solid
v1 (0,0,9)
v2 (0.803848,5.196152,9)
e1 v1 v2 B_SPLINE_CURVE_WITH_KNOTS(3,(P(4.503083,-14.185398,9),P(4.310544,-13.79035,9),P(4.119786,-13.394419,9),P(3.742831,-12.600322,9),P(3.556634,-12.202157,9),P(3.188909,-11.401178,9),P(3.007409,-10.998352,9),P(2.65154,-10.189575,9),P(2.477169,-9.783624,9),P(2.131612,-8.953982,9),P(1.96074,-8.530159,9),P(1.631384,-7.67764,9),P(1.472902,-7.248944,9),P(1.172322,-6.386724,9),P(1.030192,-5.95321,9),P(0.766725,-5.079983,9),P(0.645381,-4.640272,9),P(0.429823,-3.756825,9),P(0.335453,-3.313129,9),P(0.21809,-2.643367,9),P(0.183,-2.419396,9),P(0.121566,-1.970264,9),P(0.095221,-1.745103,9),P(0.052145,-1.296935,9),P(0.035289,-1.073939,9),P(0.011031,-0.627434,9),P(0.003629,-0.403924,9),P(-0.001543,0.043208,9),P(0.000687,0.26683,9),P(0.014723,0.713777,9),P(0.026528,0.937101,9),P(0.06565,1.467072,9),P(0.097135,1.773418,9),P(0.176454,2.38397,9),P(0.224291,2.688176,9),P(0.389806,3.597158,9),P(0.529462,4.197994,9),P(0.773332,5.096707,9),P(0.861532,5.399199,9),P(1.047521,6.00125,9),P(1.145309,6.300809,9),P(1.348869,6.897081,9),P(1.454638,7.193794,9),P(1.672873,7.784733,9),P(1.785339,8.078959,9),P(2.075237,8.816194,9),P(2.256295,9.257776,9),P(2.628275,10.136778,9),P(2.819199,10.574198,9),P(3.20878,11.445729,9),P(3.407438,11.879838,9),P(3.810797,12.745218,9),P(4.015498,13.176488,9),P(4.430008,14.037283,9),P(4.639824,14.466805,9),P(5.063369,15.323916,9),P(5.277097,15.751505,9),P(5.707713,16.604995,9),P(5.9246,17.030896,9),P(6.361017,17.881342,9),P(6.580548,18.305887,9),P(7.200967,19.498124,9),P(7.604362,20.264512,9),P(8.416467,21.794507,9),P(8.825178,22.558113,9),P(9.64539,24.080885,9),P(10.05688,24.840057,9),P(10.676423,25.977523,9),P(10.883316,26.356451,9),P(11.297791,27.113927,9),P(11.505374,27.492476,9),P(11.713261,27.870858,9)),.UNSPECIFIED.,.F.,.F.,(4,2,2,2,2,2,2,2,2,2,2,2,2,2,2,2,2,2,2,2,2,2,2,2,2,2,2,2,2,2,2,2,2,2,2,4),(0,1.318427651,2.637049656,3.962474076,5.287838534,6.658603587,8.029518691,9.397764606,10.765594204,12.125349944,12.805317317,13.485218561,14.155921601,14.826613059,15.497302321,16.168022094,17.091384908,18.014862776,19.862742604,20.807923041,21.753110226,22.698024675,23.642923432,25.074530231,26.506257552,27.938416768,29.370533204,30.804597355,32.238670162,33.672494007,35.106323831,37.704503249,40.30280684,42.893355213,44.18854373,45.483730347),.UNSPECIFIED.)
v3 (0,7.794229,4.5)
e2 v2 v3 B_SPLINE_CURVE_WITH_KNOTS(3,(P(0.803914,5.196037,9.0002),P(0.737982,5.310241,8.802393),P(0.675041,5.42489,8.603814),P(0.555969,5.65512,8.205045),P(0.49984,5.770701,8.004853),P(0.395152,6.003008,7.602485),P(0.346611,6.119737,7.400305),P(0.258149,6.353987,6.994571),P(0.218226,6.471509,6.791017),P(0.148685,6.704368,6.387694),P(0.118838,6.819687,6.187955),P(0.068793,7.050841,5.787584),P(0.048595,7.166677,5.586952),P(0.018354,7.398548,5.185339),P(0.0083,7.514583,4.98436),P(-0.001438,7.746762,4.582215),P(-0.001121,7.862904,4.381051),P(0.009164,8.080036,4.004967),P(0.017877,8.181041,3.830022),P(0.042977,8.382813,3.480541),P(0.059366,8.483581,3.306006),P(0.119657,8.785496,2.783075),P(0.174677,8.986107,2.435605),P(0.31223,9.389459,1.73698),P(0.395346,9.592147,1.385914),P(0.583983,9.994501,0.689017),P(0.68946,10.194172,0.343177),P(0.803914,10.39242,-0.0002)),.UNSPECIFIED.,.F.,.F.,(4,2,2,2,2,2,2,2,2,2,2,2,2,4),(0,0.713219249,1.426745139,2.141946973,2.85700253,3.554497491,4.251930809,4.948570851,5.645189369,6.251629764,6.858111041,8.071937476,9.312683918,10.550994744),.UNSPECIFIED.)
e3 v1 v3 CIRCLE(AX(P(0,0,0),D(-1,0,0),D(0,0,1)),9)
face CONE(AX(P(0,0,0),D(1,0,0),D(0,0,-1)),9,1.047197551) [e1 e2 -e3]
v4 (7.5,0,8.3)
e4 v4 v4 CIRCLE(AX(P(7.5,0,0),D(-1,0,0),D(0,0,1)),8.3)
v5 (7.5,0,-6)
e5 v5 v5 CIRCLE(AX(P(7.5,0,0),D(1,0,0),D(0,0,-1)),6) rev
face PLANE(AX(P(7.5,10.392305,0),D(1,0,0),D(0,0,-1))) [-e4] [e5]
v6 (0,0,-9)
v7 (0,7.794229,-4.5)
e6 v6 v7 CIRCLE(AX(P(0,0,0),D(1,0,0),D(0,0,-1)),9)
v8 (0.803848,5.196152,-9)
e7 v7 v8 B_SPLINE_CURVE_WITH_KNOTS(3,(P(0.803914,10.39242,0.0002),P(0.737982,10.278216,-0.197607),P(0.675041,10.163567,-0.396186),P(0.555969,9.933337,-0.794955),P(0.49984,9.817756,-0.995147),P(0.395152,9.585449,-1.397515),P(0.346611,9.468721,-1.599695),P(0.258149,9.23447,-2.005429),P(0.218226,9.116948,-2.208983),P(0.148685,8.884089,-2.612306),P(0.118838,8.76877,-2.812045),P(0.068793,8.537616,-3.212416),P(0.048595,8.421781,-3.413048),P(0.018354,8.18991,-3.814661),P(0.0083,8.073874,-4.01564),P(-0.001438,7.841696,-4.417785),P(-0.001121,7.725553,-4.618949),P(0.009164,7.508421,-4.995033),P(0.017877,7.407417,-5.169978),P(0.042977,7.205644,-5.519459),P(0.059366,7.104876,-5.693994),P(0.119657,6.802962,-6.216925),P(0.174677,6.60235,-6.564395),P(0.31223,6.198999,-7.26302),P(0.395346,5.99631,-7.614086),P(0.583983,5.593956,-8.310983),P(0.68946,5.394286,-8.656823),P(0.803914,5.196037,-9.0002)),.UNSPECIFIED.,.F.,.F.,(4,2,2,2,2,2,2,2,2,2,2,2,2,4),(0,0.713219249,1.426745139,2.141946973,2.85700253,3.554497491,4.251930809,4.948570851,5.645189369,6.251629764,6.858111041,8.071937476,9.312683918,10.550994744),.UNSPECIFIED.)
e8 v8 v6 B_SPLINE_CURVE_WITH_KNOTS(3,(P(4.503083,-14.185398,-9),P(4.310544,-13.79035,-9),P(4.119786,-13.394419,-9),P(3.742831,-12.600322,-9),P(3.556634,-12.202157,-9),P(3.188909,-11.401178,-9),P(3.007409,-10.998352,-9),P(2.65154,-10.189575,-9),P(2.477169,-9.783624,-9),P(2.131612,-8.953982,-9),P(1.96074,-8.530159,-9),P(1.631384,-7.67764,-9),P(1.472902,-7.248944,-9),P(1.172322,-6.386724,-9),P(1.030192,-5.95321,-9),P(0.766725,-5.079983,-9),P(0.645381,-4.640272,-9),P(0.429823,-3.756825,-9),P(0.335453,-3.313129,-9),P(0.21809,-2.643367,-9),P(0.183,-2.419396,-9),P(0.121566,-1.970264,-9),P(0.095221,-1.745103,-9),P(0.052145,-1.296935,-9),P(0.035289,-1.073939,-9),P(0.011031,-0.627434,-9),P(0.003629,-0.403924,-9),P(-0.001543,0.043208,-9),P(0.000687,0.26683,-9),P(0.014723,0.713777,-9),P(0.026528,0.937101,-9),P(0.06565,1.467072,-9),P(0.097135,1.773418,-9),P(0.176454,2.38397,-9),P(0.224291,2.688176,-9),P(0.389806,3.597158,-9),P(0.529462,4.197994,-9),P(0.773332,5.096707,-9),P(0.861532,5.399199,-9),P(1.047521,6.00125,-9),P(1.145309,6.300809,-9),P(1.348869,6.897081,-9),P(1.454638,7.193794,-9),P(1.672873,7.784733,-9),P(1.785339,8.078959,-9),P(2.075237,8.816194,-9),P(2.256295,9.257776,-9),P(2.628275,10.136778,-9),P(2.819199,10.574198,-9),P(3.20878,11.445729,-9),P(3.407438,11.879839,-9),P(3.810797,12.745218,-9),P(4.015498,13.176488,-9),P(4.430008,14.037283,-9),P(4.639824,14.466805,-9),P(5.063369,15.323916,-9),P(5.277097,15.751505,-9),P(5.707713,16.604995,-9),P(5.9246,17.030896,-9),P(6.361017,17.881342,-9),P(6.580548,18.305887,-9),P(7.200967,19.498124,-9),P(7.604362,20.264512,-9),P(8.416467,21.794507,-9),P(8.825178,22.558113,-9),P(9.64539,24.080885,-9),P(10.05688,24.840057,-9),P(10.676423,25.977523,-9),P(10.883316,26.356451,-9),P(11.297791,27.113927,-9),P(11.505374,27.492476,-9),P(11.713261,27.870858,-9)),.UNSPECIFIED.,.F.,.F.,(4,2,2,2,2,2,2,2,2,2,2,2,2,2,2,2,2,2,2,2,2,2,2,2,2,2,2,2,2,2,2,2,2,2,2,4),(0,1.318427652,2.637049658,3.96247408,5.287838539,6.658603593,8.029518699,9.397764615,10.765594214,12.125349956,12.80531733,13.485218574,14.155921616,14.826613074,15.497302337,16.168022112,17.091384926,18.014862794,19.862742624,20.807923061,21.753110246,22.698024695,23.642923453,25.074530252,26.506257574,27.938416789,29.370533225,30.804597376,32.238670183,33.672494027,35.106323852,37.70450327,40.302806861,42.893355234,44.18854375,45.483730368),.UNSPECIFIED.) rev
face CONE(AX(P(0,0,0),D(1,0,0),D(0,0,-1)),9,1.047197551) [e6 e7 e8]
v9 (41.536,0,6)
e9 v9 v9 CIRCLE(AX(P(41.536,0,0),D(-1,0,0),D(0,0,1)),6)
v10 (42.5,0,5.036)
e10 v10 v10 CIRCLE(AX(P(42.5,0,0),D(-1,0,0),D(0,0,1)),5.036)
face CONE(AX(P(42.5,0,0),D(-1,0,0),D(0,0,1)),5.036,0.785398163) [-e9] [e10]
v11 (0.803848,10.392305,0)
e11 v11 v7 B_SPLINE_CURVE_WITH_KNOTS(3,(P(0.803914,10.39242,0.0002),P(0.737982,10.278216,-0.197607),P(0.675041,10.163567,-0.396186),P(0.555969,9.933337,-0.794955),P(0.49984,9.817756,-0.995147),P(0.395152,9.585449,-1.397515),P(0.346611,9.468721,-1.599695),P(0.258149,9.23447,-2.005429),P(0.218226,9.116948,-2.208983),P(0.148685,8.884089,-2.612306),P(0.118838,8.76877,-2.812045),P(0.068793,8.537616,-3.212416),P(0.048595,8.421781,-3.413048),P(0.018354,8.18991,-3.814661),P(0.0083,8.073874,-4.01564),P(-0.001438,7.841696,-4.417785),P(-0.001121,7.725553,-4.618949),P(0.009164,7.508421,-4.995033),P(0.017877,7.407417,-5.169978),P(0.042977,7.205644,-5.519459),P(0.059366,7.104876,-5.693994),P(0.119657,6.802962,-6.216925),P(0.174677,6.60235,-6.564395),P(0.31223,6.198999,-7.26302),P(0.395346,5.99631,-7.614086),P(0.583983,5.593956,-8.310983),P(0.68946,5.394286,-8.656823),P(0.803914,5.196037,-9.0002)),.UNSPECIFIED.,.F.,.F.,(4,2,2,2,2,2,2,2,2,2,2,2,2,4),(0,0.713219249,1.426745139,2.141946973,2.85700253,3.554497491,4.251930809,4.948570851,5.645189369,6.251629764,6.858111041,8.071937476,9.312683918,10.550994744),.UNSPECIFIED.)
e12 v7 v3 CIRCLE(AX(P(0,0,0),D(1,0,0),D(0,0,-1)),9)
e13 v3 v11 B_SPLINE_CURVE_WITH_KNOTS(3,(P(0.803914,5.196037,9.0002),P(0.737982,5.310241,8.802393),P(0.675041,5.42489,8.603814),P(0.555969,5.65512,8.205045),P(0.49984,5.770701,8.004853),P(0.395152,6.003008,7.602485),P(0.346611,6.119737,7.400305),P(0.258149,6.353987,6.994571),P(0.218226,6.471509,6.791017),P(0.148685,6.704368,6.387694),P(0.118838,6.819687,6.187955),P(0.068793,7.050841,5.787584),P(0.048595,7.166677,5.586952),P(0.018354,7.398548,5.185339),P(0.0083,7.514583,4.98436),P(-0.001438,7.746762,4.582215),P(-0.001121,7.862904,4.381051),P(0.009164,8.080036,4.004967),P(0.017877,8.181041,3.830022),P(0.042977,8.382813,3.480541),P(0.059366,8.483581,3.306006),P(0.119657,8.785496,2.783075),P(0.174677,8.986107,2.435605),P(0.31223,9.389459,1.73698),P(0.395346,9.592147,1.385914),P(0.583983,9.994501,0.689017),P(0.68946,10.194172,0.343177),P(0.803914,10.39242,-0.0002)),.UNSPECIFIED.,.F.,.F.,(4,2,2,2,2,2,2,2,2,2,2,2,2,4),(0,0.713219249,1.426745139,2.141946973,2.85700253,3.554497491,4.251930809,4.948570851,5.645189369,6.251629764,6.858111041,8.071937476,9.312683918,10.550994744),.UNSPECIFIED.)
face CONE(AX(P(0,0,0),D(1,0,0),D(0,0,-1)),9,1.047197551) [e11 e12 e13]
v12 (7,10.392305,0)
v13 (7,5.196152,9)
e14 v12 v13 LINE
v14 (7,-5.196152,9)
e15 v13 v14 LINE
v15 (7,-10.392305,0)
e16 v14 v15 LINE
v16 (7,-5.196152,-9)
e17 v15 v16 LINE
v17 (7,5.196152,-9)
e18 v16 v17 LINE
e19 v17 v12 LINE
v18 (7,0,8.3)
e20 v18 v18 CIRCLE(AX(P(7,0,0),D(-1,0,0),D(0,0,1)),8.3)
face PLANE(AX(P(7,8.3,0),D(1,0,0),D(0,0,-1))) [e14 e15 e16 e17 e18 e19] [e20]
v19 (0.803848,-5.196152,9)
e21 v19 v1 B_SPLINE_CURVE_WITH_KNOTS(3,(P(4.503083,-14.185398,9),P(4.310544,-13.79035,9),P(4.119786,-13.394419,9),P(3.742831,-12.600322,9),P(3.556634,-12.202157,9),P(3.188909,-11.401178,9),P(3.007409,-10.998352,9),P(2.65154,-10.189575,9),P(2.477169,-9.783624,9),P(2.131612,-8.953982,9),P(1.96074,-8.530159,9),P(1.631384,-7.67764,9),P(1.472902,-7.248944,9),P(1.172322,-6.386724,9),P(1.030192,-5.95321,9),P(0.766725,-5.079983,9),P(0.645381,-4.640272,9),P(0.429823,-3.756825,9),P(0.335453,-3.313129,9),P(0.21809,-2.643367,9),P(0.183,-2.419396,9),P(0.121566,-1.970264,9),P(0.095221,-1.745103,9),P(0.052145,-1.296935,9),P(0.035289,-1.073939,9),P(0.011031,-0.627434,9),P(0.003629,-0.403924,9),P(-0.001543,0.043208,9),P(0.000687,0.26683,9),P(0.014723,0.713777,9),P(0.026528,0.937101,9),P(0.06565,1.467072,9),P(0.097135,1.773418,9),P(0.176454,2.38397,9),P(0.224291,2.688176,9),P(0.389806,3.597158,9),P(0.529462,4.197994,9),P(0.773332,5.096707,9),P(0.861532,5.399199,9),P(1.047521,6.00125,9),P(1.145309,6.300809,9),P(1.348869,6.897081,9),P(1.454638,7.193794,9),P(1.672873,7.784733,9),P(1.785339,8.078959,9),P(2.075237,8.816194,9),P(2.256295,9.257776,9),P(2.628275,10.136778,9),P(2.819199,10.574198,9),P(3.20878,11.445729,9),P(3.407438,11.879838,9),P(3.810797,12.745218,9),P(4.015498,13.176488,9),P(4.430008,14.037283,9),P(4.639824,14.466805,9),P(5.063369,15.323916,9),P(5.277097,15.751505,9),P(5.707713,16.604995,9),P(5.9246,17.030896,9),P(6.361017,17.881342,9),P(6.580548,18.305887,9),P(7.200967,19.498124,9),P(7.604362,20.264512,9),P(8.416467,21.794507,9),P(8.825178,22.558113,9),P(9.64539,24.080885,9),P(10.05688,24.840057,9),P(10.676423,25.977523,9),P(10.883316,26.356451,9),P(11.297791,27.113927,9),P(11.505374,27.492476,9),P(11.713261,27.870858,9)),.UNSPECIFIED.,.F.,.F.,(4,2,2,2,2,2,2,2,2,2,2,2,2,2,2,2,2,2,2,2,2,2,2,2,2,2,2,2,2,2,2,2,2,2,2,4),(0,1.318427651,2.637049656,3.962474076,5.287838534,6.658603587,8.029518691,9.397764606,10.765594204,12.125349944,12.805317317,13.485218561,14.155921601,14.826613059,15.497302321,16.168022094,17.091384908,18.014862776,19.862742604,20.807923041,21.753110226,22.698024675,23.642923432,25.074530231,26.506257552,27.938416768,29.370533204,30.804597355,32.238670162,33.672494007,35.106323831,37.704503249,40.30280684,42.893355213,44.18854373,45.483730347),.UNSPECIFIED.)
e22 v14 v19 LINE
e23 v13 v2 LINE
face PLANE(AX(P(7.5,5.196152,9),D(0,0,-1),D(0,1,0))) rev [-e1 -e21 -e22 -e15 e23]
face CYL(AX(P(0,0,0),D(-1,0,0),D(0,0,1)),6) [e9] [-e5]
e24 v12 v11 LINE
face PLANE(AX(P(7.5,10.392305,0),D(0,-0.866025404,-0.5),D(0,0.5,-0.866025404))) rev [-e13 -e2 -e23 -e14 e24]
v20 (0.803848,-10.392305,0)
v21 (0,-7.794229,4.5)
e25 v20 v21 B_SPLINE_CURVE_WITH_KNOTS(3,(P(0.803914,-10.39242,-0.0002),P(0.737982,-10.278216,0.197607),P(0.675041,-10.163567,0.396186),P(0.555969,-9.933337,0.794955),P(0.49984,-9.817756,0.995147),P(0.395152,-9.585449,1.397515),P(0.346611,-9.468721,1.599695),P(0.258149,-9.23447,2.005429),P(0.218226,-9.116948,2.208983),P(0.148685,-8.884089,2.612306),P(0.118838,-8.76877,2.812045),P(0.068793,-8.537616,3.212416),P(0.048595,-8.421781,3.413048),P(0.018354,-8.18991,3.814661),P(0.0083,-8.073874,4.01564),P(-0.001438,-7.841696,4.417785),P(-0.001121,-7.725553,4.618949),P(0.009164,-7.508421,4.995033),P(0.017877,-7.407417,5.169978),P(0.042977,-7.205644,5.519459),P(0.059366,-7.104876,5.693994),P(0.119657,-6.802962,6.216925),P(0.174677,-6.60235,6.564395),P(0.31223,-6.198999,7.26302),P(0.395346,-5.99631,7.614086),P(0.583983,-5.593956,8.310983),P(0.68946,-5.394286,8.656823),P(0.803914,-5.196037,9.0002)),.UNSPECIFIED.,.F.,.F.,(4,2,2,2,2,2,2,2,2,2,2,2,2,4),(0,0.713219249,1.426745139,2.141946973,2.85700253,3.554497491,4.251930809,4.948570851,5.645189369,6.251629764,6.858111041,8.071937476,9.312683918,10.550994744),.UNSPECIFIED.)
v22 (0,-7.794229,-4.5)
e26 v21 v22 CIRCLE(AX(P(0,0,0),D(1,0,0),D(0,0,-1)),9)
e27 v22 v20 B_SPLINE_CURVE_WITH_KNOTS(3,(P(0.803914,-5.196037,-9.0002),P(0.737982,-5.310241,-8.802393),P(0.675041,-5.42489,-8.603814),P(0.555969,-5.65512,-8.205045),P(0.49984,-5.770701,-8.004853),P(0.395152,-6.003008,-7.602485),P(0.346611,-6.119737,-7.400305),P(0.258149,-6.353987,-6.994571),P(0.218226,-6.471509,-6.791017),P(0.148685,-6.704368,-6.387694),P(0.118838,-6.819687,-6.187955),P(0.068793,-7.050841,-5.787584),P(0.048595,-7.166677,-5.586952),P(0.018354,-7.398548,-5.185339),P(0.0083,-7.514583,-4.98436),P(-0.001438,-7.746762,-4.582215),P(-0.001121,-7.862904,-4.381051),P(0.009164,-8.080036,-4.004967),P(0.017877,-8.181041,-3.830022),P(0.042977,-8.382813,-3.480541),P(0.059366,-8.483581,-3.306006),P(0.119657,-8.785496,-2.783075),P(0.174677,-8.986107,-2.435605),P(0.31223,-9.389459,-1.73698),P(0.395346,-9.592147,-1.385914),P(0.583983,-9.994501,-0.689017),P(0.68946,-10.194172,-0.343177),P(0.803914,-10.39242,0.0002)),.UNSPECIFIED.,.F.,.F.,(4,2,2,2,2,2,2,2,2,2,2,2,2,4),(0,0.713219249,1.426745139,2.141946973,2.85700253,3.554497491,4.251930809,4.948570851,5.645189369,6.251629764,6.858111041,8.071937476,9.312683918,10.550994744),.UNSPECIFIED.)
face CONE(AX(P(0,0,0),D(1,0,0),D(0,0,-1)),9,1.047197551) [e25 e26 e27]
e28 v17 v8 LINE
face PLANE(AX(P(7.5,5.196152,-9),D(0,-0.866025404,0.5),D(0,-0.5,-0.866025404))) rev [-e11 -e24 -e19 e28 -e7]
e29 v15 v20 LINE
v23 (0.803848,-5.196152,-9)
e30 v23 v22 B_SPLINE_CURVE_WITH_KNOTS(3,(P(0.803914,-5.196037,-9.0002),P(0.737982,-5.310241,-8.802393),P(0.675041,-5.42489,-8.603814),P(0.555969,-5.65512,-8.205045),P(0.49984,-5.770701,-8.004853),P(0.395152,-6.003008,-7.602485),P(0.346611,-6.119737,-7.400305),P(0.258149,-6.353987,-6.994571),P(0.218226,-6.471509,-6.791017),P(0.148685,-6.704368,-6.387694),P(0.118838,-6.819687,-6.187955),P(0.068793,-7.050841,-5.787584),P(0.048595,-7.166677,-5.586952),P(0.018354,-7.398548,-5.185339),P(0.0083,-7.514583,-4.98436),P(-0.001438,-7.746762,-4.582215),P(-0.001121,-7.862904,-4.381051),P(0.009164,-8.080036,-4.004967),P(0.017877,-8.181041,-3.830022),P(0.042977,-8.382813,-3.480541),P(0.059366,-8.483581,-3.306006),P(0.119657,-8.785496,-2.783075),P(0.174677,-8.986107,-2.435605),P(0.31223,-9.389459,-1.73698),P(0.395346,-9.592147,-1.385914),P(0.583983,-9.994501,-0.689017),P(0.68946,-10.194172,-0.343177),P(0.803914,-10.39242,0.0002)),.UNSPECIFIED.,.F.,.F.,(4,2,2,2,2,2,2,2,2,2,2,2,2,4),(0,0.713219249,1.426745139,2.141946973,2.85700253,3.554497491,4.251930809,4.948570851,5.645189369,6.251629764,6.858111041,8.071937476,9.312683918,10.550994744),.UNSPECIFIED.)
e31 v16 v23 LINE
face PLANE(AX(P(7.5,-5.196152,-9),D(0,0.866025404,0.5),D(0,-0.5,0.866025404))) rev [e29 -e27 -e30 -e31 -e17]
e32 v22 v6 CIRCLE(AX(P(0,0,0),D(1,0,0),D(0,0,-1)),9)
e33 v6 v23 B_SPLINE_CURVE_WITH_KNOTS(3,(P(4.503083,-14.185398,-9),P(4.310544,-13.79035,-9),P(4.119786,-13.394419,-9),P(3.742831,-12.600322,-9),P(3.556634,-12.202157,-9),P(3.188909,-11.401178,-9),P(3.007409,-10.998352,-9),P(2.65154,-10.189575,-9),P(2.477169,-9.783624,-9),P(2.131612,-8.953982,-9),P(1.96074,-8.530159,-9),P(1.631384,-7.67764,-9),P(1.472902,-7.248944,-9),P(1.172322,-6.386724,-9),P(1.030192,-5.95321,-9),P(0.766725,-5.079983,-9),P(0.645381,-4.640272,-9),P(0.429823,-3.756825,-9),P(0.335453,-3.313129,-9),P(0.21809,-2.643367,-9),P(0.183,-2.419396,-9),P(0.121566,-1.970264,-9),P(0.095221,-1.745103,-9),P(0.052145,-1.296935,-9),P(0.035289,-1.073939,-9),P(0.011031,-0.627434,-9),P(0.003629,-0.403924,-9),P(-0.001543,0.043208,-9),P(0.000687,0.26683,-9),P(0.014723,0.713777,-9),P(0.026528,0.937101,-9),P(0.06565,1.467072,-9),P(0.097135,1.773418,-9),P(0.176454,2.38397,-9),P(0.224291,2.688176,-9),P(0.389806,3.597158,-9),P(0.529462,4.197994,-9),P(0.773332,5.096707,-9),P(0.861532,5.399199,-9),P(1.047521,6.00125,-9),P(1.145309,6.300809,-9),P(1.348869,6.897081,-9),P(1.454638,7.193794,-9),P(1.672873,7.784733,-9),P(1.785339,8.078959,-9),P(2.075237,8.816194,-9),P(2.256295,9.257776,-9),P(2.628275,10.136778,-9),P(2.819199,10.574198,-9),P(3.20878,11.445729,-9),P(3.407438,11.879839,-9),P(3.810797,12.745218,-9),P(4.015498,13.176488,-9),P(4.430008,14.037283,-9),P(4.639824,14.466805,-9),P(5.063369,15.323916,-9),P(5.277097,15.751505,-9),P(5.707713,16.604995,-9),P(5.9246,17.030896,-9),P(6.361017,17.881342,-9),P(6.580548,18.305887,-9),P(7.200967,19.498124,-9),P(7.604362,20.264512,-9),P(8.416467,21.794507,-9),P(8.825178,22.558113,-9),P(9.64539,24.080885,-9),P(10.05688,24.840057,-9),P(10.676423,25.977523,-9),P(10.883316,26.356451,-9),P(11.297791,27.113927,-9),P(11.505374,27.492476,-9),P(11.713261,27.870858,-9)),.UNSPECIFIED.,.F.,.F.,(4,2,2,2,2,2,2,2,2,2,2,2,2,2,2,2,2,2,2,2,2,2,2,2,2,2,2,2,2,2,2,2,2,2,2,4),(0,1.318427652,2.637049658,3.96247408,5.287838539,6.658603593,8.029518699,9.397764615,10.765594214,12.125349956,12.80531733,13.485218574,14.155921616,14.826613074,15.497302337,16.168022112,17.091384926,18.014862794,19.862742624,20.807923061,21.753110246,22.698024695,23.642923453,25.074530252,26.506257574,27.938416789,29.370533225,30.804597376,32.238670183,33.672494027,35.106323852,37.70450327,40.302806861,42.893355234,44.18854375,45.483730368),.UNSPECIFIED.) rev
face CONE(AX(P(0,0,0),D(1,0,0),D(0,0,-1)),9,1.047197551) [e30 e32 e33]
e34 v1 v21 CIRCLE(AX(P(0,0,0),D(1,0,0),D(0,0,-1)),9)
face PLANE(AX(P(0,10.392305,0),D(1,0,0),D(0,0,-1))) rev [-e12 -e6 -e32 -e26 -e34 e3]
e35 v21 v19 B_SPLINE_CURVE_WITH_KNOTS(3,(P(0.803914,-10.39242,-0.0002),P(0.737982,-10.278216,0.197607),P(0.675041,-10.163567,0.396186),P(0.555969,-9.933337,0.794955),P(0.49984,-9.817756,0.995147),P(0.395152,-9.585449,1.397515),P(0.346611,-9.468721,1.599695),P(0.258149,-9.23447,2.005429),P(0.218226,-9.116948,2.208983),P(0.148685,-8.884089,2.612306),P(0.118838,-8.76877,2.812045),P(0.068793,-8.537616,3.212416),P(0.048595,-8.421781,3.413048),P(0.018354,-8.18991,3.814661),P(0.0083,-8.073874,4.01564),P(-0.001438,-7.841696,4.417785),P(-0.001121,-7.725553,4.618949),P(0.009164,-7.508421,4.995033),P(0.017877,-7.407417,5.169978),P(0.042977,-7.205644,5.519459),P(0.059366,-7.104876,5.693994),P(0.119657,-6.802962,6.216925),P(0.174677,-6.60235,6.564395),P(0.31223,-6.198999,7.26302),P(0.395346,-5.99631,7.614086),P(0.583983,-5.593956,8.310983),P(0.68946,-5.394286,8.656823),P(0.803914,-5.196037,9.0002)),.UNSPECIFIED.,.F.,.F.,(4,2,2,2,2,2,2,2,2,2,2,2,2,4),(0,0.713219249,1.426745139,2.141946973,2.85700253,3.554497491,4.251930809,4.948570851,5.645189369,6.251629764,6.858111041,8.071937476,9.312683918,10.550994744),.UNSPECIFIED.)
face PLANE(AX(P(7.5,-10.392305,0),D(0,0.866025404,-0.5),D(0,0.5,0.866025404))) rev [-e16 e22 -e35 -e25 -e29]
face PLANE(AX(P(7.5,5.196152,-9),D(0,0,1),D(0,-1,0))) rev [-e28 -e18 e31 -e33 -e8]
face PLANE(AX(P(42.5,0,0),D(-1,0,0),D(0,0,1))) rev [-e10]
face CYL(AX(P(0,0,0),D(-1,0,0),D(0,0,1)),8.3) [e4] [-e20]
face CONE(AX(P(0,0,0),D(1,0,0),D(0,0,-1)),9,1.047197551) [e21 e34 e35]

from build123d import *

# Parameters (mm, degrees)
BASEHEAD_DEPTH = 7.5
SKETCH4_W      = 0.5
SKETCH4_H      = 12.092304845


# Read off the part's stored shape, not the designer's step: HeadChamfer
with BuildPart() as part:
    # Sketch1 → BaseHead (new body)
    with BuildSketch(Plane(origin=(0, 0, 0), x_dir=(0, 0, -1), z_dir=(1, 0, 0))):
        Polygon((9, 5.196152423), (9, -5.196152423), (0, -10.392304845), (-9, -5.196152423), (-9, 5.196152423), (0, 10.392304845), align=None)
    extrude(amount=BASEHEAD_DEPTH)

    # HeadChamfer outline → HeadChamfer (revolve, cut)
    with BuildSketch(Plane.YX):
        Polygon((10.392304847, 0.803847578), (9, 0), (10.392304847, 0), align=None)
    revolve(axis=Axis((0, 0, 0), (1, 0, 0)), mode=Mode.SUBTRACT)

    # HeadChamfer 2 outline → HeadChamfer 2 (revolve)
    with BuildSketch(Plane.YX):
        Polygon((6, 7.5), (6, 41.536), (5.036, 42.5), (0, 42.5), (0, 7.5), align=None)
    revolve(axis=Axis((0, 0, 0), (1, 0, 0)))

    # Sketch4 → BearingFace (revolve, cut)
    with BuildSketch(Plane.XY, mode=Mode.PRIVATE) as bearingface_sk:
        with Locations((7.25, 14.346152423)):
            Rectangle(SKETCH4_W, SKETCH4_H)
    revolve(bearingface_sk.sketch.rotate(Axis((0, 0, 0), (1, 0, 0)), 90), axis=Axis((0, 0, 0), (1, 0, 0)), mode=Mode.SUBTRACT)


solid = part.part
